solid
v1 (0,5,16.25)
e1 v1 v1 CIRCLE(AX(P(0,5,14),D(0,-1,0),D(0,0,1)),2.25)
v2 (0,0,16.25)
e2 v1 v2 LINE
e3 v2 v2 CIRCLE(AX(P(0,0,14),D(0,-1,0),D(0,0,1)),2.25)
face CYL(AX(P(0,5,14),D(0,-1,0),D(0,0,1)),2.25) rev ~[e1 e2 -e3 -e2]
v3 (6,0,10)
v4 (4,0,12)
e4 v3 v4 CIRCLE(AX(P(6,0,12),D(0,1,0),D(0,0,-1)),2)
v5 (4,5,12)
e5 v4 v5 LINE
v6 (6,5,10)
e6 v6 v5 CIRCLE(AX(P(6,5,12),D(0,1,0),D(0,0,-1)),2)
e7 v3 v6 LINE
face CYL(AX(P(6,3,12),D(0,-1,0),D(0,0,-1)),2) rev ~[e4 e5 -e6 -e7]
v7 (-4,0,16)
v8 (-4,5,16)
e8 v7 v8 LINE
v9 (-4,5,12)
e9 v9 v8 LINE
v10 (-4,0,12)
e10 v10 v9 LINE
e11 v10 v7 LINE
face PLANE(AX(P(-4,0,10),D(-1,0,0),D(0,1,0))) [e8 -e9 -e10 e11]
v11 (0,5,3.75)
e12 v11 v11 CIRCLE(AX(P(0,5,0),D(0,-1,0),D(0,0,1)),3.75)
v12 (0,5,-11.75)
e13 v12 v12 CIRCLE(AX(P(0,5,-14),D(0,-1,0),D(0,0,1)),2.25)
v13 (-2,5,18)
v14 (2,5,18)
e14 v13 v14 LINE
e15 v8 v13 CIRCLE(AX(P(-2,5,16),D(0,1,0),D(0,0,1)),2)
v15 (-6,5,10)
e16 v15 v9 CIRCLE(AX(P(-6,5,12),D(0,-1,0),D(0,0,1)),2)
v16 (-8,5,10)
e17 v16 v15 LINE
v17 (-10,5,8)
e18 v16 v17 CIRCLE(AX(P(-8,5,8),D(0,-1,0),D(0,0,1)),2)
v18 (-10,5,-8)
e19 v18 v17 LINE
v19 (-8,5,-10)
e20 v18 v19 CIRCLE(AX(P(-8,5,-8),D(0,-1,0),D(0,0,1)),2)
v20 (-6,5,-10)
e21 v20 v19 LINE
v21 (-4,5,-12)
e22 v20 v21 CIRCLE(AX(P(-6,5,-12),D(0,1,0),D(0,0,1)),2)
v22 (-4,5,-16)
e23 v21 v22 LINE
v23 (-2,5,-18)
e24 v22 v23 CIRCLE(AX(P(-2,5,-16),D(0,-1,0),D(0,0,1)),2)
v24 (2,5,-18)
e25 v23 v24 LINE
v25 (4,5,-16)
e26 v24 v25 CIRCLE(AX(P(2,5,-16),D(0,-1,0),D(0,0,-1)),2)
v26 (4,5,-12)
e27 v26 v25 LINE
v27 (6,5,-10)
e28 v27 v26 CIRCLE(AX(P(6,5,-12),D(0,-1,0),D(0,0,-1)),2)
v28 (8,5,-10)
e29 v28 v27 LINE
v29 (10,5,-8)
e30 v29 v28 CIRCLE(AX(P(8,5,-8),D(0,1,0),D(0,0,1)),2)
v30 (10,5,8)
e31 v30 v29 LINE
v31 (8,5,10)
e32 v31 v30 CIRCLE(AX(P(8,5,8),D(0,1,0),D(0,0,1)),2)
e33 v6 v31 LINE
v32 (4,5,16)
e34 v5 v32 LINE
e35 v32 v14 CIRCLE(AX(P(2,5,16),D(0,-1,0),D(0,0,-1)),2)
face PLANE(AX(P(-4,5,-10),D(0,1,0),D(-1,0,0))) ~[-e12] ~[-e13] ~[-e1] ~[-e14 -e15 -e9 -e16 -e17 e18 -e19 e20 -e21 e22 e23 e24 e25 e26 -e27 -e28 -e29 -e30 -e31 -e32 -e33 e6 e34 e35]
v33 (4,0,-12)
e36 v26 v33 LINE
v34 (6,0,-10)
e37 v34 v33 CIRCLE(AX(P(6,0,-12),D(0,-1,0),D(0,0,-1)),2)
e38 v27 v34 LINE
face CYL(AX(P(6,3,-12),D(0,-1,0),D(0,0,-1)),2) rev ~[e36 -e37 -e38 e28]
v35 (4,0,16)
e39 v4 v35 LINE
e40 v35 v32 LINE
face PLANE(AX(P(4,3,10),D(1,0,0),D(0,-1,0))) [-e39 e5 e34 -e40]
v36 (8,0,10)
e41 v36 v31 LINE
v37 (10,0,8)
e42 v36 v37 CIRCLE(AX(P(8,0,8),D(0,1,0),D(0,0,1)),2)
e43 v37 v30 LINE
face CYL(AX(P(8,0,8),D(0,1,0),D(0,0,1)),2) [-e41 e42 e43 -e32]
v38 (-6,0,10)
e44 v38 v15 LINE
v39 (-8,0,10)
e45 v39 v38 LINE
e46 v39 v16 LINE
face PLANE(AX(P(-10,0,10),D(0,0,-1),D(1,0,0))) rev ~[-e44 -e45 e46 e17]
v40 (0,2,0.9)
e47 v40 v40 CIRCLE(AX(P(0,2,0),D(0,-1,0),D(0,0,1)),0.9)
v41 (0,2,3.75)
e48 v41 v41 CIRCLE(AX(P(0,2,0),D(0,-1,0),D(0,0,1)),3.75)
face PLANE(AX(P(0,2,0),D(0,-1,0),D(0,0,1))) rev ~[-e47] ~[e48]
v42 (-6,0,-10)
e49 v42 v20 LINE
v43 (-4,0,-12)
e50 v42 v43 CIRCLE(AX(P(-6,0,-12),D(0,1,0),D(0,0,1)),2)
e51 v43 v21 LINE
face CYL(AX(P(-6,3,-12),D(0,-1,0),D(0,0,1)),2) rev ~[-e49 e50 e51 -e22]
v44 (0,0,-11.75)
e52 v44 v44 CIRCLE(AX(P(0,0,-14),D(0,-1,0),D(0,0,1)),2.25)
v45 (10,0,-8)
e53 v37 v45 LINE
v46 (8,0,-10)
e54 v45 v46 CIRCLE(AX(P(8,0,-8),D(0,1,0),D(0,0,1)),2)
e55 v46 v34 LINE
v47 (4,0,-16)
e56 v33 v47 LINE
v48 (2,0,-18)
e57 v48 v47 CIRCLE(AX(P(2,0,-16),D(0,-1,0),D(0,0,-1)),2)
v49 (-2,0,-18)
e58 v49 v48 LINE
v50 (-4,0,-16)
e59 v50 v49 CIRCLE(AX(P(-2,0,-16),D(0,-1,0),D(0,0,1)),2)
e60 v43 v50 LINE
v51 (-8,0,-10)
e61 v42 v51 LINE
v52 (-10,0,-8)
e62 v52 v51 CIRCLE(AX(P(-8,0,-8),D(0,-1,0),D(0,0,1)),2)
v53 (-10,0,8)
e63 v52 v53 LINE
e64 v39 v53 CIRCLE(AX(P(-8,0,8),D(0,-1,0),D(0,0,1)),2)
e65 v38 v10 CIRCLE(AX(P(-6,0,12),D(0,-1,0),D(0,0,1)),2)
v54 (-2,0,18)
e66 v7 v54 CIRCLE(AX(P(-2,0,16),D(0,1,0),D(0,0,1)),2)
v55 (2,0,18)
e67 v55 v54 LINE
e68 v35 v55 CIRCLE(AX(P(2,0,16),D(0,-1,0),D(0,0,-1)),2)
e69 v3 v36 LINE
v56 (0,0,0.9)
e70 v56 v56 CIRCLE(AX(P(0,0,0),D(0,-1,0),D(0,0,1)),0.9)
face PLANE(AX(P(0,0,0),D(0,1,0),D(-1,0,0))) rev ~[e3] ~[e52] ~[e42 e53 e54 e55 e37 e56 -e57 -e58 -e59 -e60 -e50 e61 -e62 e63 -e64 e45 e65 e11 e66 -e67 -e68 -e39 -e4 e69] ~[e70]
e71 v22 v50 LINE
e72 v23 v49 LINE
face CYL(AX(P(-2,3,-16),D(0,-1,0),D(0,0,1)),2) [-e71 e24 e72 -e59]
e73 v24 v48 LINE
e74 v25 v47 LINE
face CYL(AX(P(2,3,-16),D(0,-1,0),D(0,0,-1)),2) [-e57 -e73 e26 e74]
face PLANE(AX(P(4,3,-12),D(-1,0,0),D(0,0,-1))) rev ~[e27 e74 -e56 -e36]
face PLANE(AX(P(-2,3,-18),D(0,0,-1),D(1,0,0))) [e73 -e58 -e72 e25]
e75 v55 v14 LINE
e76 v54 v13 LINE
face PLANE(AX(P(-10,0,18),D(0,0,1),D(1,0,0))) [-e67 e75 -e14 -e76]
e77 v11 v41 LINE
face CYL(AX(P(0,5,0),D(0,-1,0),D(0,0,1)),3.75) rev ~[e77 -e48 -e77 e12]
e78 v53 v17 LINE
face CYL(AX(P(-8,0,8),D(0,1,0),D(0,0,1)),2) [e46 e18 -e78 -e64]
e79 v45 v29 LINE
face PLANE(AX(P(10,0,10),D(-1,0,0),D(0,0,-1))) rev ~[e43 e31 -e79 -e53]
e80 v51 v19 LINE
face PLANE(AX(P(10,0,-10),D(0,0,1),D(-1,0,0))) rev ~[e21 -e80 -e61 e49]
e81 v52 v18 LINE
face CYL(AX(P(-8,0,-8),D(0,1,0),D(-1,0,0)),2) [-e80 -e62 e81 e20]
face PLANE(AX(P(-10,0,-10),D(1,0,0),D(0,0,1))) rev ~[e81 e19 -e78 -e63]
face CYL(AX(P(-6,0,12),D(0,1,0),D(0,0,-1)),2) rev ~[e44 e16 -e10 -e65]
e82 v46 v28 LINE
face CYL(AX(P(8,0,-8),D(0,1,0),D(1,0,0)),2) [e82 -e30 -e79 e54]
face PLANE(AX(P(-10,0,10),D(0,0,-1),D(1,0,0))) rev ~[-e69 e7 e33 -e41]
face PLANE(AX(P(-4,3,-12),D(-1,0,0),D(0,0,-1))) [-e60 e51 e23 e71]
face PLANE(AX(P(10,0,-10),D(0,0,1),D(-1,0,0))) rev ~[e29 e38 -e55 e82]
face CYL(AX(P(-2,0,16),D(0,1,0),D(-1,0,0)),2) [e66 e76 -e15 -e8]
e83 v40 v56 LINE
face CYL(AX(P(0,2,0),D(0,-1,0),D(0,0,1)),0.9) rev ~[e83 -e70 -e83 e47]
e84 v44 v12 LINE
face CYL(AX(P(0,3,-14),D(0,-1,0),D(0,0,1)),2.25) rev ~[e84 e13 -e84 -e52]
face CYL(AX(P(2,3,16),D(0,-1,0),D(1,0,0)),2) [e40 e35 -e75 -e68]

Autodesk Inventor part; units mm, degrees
ref_plane "YZ Plane" through (0, 0, 0) normal (1, 0, 0) x (0, 1, 0)
ref_plane "XZ Plane" through (0, 0, 0) normal (0, 1, 0) x (-1, 0, 0)
ref_plane "XY Plane" through (0, 0, 0) normal (0, 0, 1) x (1, 0, 0)
sketch "Sketch1" plane through (0, 0, 0) normal (0, 1, 0) x (-1, 0, 0)
  line L0 (-10, 10) -> (-10, -10)
  line L1 (-10, -10) -> (10, -10)
  line L2 (10, -10) -> (10, 10)
  line L3 (10, 10) -> (-10, 10)
  line L4 (-10, 10) -> (10, -10) construction
  line L5 (-10, -10) -> (10, 10) construction
  point P0 (0, 0)
  dimension "d0" = 20
  dimension "d1" = 20
extrude "Extrusion1" add sketch "Sketch1" along normal blind 5
sketch "Sketch2" plane through (-10, 0, 10) normal (0, 0, 1) x (1, 0, 0)
  point P0 (10, 0)
sketch "Sketch3" plane through (0, 5, 0) normal (0, 1, 0) x (1, 0, 0)
  point P0 (0, 0)
  point P1 (0, 0)
hole "Hole1" at (0, 5, 0) direction (0, -1, 0) diameter 1.8 end through all counterbore diameter 7.5 counterbore depth 3 clearance for "Socket Head Cap Screw" size "M1.6" standard "Ansi Metric M Profile"
sketch "Sketch4" plane through (-10, 0, 10) normal (0, 0, 1) x (1, 0, 0)
  line L0 (10, 0) -> (10, 1.5)
  line L1 (14, 3) -> (14, 0)
  line L2 (14, 0) -> (6, 0)
  line L3 (6, 0) -> (6, 3)
  line L4 (6, 3) -> (14, 3)
  line L5 (14, 3) -> (6, 0) construction
  line L6 (14, 0) -> (6, 3) construction
  dimension "d11" = 8
extrude "Extrusion2" add sketch "Sketch4" along normal blind 8
mirror "Mirror1" about plane through (0, 0, 0) normal (0, 0, 1) of "Extrusion2"
sketch "Sketch5" plane through (0, 5, 0) normal (0, 1, 0) x (1, 0, 0)
  line L0 (0, 0) -> (0, -14)
  line L1 (0, 0) -> (0, 14)
  dimension "d14" = 14
  dimension "d15" = 14
hole "Hole2" at (0, 5, 14) at (0, 5, -14) direction (0, -1, 0) diameter 4.5 end through all clearance for "Socket Head Cap Screw" size "M4" standard "Ansi Metric M Profile"
fillet "Fillet1" radius 2 12 edges at (4, 1.5, 10) (4, 1.5, 18) (10, 2.5, 10) (10, 2.5, -10) (4, 1.5, -10) (4, 1.5, -18) (-4, 1.5, -18) (-4, 1.5, -10) (-10, 2.5, -10) (-10, 2.5, 10) (-4, 1.5, 10) (-4, 1.5, 18)
move faces "Move1" translate (0, 2, 0) faces at (0, 3, 10.5833)
move faces "Move2" translate (0, 2, 0) faces at (3.4661, 2, -17.3603) (4.5339, 2, -10.6397) (0, 3, -10.8742)
properties part number "microsoft-lifecam-baseplate"
